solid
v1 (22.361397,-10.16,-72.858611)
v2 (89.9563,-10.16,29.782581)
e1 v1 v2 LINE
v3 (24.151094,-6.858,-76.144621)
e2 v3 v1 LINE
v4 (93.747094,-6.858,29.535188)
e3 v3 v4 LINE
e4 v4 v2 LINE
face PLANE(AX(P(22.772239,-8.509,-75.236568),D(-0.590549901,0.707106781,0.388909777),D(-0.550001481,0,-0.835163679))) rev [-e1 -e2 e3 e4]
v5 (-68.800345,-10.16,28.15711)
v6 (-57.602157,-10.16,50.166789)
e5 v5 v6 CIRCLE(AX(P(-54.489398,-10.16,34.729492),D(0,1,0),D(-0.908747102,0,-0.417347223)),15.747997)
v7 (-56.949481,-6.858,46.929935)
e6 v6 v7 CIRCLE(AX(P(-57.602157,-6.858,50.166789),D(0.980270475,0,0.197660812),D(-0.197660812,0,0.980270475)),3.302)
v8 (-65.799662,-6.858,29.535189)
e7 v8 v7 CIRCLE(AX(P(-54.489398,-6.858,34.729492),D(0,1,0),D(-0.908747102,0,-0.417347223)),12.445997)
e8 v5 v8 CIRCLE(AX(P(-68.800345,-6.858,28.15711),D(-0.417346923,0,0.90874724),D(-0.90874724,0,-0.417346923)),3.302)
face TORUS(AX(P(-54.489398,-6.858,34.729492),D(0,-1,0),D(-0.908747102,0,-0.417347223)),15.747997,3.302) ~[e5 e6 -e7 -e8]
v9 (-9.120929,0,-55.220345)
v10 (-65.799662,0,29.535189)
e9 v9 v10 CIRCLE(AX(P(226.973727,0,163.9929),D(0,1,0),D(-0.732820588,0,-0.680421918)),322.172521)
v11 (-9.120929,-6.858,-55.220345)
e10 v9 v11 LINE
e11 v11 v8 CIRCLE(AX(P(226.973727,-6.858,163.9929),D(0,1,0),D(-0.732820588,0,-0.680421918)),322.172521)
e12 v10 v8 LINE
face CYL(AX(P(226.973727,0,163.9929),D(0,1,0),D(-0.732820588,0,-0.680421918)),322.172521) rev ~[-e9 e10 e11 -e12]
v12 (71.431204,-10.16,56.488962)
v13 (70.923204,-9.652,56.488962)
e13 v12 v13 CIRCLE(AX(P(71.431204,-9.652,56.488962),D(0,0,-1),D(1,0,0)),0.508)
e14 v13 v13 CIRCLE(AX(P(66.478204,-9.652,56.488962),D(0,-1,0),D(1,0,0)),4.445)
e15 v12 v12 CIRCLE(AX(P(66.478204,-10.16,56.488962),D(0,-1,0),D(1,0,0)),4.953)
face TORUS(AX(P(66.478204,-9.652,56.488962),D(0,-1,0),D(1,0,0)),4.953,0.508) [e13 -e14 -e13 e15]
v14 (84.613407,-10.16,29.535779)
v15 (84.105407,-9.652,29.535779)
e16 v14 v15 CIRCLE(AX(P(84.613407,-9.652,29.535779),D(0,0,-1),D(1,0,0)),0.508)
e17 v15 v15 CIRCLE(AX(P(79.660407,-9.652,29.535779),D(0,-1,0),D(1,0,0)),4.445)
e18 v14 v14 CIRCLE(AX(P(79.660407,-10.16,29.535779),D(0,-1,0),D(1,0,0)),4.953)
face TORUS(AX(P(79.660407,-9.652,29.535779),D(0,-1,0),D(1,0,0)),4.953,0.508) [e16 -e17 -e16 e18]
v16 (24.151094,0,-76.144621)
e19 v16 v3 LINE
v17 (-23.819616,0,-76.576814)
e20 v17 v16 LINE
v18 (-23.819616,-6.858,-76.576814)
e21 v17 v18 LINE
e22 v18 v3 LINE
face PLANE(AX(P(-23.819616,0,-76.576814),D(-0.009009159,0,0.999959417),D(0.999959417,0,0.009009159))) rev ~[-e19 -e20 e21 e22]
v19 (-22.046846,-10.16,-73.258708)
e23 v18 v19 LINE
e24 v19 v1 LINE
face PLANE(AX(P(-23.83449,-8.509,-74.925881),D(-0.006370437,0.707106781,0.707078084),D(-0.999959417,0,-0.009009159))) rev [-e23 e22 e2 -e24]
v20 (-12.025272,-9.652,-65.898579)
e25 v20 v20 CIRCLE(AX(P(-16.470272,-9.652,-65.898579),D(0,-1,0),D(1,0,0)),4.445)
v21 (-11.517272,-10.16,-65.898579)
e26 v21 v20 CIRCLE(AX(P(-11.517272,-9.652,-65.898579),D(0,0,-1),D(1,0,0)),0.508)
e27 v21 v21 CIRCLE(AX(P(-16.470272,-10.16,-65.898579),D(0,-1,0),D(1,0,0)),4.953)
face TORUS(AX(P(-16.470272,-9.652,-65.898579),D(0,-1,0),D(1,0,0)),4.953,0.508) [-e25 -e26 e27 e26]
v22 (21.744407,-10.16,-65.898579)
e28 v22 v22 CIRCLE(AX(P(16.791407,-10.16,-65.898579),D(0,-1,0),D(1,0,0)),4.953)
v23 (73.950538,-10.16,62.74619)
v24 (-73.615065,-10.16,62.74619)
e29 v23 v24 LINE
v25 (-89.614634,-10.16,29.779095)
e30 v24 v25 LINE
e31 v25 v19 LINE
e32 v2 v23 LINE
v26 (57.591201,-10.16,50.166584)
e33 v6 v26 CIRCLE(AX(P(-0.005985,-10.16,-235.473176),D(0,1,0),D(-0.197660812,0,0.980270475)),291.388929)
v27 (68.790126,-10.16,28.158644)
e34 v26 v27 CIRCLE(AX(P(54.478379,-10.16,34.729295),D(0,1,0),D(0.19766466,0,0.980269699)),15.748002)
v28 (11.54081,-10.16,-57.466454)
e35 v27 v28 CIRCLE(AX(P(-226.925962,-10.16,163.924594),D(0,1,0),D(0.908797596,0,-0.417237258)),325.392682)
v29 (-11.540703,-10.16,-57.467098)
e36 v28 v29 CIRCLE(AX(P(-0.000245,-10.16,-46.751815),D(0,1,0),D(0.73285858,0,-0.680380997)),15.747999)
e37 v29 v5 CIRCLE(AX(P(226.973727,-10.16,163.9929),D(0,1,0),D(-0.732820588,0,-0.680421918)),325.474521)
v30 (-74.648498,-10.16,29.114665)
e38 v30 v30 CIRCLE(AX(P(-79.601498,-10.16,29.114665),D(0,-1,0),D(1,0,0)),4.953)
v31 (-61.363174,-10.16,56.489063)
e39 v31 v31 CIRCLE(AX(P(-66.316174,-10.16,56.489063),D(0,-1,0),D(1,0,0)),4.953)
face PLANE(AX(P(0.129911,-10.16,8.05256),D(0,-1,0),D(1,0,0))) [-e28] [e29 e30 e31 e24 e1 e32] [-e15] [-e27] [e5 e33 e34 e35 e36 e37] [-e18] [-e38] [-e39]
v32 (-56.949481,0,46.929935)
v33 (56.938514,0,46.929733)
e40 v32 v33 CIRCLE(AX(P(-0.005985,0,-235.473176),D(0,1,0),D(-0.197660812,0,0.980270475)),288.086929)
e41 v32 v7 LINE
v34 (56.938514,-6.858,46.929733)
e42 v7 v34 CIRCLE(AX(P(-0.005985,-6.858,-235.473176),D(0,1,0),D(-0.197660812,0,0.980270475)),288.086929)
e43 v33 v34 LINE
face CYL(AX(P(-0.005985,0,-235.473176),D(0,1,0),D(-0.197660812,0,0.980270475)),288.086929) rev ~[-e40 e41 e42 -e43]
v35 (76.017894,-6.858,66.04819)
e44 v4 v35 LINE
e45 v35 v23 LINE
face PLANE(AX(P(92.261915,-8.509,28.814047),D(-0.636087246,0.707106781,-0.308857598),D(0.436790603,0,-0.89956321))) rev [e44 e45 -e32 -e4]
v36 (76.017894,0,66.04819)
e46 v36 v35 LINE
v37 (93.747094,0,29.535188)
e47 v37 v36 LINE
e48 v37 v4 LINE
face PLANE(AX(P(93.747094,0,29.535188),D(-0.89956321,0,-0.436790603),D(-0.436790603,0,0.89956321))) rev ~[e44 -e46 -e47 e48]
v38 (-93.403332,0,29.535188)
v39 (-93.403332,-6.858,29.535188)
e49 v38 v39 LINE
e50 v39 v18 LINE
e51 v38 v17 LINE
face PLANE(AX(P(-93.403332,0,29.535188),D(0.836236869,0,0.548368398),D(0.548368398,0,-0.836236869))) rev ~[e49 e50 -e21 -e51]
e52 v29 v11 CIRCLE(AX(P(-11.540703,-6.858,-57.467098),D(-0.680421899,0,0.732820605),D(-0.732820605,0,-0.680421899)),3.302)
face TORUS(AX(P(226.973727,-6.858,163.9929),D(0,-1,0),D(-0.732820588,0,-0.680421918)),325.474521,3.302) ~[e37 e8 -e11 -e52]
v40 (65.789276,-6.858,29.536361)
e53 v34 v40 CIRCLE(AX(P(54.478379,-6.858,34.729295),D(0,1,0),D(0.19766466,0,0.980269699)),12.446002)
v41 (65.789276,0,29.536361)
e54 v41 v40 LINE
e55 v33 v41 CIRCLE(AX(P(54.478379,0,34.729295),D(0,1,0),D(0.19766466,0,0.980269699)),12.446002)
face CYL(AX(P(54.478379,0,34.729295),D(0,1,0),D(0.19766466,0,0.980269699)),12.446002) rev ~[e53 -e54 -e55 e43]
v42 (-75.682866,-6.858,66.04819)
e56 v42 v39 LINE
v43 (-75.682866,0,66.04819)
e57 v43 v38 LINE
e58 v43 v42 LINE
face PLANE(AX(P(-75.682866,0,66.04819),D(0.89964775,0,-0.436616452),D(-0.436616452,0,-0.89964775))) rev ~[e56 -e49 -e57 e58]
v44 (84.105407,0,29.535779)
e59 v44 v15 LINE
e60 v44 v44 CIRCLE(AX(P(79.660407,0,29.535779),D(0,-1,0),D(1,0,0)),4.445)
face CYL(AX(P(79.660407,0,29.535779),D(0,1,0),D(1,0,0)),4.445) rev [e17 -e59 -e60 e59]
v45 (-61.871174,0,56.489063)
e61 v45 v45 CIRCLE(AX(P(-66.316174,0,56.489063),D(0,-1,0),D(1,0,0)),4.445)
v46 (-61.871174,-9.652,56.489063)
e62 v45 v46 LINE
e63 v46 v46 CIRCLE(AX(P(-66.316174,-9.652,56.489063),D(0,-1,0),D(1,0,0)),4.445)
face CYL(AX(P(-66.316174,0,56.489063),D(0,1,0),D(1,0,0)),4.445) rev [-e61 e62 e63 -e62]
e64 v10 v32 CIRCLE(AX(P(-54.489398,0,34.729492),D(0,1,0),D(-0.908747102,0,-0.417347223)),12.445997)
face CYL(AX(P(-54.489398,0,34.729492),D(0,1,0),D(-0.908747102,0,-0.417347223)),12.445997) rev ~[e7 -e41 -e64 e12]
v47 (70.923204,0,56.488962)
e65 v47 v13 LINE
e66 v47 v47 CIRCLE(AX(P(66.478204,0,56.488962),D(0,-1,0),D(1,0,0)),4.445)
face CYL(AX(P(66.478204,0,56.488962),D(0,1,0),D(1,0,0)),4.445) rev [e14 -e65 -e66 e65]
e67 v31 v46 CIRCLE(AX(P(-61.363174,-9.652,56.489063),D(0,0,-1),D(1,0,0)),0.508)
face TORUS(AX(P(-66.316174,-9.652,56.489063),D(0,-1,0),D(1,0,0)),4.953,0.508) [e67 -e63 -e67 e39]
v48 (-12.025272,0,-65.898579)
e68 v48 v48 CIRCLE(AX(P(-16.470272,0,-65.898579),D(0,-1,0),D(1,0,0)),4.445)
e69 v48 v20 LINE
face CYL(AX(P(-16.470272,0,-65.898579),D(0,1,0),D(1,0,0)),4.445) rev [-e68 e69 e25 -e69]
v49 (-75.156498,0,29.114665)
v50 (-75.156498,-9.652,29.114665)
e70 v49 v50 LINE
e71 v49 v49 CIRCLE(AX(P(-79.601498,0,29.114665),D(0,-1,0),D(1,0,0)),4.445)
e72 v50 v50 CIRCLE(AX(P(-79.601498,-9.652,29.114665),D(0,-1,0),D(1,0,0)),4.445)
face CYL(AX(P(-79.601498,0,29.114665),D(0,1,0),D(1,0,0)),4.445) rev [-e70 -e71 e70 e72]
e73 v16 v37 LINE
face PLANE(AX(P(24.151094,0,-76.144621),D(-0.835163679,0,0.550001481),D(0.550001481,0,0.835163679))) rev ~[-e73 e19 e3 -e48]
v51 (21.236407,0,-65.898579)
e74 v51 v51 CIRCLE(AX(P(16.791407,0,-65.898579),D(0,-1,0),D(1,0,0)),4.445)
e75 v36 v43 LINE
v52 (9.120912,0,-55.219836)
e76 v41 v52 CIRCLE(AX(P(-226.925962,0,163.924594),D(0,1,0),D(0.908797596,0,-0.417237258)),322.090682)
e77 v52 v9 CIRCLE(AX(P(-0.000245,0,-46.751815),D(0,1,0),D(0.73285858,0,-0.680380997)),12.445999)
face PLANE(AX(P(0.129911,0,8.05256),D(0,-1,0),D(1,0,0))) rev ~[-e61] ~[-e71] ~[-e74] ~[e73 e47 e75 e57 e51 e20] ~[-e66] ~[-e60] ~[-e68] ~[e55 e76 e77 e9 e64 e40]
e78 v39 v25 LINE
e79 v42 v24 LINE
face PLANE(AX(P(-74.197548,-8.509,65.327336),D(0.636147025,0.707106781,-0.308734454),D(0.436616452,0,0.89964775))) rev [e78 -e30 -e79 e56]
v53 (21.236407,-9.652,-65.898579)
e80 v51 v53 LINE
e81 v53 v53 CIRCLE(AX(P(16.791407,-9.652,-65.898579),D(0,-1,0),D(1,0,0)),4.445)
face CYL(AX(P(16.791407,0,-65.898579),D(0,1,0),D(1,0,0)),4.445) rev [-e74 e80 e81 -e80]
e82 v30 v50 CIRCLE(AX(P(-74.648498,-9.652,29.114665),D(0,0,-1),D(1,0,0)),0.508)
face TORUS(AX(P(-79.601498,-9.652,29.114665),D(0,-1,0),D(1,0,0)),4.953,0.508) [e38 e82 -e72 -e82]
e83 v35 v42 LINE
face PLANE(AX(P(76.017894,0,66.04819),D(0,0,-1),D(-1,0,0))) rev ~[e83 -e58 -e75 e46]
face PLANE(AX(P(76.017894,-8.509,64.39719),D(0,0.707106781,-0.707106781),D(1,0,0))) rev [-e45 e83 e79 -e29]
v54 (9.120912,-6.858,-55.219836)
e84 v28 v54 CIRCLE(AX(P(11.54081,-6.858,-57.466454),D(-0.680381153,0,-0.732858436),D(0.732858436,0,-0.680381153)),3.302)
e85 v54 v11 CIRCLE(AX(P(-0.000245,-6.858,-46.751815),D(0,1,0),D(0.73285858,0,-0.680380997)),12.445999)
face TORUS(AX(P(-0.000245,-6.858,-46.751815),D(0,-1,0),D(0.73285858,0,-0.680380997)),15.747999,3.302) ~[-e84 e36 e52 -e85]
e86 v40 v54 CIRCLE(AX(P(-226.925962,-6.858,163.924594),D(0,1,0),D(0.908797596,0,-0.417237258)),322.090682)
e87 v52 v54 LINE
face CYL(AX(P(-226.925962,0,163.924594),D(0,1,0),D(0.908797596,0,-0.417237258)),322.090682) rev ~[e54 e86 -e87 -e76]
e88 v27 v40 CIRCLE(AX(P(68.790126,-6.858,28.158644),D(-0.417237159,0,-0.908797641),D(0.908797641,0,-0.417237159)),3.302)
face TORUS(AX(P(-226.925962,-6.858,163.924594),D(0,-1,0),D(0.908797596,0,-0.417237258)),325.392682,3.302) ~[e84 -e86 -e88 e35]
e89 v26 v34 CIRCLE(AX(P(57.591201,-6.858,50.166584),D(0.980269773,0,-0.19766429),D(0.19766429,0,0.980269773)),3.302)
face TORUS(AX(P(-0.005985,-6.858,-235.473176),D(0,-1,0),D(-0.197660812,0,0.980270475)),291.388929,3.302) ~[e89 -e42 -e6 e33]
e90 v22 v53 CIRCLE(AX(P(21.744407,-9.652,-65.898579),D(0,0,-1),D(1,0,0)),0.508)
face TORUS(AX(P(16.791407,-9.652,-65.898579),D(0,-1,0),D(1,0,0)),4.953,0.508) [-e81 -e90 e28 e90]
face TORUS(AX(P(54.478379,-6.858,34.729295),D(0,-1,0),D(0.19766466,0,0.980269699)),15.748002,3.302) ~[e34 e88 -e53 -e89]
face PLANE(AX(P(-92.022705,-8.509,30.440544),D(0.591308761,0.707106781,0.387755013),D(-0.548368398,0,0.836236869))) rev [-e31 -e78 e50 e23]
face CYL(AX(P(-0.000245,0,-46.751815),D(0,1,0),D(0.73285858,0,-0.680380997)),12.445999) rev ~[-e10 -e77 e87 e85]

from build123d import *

# Parameters (mm, degrees)
F0_R     = 4.445
F1_DEPTH = 10.16
F2_SIZE  = 3.302
F3_R     = 3.302
F4_R     = 0.508


# Not quite as in the source:
# - ends of sketch curves that miss each other by under 0.0002 mm in the source are joined


with BuildPart() as f1:
    # F0 (on Front) → F1 (new body)
    with BuildSketch(Plane.XZ):
        Polygon((76.0178938508, 66.0481899977), (-75.6828660357, 66.0481899977), (-93.4033319354, 29.5351882561), (-23.8196160644, -76.5768140554), (24.1510938508, -76.1446207762), (93.7470938508, 29.5351882561), align=None)
        with Locations((-16.4702718891, -65.8985787277)):
            Circle(F0_R, mode=Mode.SUBTRACT)
        with Locations((16.7914066574, -65.8985787277)):
            Circle(F0_R, mode=Mode.SUBTRACT)
        with Locations((-79.6014981537, 29.1146653051)):
            Circle(F0_R, mode=Mode.SUBTRACT)
        with BuildLine():
            ThreePointArc((-56.9494813246, 46.9299354111), (-0.0054737788, 52.6137538254), (56.9385136023, 46.9297333914))
            ThreePointArc((56.9385136023, 46.9297333914), (65.5708398339, 40.3737851527), (65.7892758616, 29.5363607275))
            ThreePointArc((65.7892758616, 29.5363607275), (40.8299827062, -15.0982028275), (9.1209118413, -55.2198356451))
            ThreePointArc((9.1209118413, -55.2198356451), (0.0001026866, -59.1978132725), (-9.1209291224, -55.2203447077))
            ThreePointArc((-9.1209291224, -55.2203447077), (-40.8344645229, -15.0989921518), (-65.7996619894, 29.5351893503))
            ThreePointArc((-65.7996619894, 29.5351893503), (-65.5821849152, 40.3733311732), (-56.9494813246, 46.9299354111))
        make_face(mode=Mode.SUBTRACT)
        with Locations((-66.3161736801, 56.4890627044)):
            Circle(F0_R, mode=Mode.SUBTRACT)
        with Locations((79.6604069033, 29.5357785845)):
            Circle(F0_R, mode=Mode.SUBTRACT)
        with Locations((66.4782037265, 56.4889616946)):
            Circle(F0_R, mode=Mode.SUBTRACT)
    extrude(amount=F1_DEPTH)

    # F2
    f2_edges = [f1.edges().sort_by_distance(p)[0] for p in [
        (-84.543099, -10.16, 47.791689),
        (0.167514, -10.16, 66.04819),
        (0.165739, -10.16, -76.360717),
        (-58.611474, -10.16, -23.520813),
        (58.949094, -10.16, -23.304716),
        (84.882494, -10.16, 47.791689),
    ]]
    chamfer(f2_edges, length=F2_SIZE)

    # F3
    f3_edges = [f1.edges().sort_by_distance(p)[0] for p in [
        (-0.005474, -10.16, 52.613754),
    ]]
    fillet(f3_edges, radius=F3_R)

    # F4
    f4_edges = [f1.edges().sort_by_distance(p)[0] for p in [
        (-84.046498, -10.16, 29.114665),
        (-70.761174, -10.16, 56.489063),
        (62.033204, -10.16, 56.488962),
        (75.215407, -10.16, 29.535779),
        (-20.915272, -10.16, -65.898579),
        (12.346407, -10.16, -65.898579),
    ]]
    fillet(f4_edges, radius=F4_R)


solid = f1.part
